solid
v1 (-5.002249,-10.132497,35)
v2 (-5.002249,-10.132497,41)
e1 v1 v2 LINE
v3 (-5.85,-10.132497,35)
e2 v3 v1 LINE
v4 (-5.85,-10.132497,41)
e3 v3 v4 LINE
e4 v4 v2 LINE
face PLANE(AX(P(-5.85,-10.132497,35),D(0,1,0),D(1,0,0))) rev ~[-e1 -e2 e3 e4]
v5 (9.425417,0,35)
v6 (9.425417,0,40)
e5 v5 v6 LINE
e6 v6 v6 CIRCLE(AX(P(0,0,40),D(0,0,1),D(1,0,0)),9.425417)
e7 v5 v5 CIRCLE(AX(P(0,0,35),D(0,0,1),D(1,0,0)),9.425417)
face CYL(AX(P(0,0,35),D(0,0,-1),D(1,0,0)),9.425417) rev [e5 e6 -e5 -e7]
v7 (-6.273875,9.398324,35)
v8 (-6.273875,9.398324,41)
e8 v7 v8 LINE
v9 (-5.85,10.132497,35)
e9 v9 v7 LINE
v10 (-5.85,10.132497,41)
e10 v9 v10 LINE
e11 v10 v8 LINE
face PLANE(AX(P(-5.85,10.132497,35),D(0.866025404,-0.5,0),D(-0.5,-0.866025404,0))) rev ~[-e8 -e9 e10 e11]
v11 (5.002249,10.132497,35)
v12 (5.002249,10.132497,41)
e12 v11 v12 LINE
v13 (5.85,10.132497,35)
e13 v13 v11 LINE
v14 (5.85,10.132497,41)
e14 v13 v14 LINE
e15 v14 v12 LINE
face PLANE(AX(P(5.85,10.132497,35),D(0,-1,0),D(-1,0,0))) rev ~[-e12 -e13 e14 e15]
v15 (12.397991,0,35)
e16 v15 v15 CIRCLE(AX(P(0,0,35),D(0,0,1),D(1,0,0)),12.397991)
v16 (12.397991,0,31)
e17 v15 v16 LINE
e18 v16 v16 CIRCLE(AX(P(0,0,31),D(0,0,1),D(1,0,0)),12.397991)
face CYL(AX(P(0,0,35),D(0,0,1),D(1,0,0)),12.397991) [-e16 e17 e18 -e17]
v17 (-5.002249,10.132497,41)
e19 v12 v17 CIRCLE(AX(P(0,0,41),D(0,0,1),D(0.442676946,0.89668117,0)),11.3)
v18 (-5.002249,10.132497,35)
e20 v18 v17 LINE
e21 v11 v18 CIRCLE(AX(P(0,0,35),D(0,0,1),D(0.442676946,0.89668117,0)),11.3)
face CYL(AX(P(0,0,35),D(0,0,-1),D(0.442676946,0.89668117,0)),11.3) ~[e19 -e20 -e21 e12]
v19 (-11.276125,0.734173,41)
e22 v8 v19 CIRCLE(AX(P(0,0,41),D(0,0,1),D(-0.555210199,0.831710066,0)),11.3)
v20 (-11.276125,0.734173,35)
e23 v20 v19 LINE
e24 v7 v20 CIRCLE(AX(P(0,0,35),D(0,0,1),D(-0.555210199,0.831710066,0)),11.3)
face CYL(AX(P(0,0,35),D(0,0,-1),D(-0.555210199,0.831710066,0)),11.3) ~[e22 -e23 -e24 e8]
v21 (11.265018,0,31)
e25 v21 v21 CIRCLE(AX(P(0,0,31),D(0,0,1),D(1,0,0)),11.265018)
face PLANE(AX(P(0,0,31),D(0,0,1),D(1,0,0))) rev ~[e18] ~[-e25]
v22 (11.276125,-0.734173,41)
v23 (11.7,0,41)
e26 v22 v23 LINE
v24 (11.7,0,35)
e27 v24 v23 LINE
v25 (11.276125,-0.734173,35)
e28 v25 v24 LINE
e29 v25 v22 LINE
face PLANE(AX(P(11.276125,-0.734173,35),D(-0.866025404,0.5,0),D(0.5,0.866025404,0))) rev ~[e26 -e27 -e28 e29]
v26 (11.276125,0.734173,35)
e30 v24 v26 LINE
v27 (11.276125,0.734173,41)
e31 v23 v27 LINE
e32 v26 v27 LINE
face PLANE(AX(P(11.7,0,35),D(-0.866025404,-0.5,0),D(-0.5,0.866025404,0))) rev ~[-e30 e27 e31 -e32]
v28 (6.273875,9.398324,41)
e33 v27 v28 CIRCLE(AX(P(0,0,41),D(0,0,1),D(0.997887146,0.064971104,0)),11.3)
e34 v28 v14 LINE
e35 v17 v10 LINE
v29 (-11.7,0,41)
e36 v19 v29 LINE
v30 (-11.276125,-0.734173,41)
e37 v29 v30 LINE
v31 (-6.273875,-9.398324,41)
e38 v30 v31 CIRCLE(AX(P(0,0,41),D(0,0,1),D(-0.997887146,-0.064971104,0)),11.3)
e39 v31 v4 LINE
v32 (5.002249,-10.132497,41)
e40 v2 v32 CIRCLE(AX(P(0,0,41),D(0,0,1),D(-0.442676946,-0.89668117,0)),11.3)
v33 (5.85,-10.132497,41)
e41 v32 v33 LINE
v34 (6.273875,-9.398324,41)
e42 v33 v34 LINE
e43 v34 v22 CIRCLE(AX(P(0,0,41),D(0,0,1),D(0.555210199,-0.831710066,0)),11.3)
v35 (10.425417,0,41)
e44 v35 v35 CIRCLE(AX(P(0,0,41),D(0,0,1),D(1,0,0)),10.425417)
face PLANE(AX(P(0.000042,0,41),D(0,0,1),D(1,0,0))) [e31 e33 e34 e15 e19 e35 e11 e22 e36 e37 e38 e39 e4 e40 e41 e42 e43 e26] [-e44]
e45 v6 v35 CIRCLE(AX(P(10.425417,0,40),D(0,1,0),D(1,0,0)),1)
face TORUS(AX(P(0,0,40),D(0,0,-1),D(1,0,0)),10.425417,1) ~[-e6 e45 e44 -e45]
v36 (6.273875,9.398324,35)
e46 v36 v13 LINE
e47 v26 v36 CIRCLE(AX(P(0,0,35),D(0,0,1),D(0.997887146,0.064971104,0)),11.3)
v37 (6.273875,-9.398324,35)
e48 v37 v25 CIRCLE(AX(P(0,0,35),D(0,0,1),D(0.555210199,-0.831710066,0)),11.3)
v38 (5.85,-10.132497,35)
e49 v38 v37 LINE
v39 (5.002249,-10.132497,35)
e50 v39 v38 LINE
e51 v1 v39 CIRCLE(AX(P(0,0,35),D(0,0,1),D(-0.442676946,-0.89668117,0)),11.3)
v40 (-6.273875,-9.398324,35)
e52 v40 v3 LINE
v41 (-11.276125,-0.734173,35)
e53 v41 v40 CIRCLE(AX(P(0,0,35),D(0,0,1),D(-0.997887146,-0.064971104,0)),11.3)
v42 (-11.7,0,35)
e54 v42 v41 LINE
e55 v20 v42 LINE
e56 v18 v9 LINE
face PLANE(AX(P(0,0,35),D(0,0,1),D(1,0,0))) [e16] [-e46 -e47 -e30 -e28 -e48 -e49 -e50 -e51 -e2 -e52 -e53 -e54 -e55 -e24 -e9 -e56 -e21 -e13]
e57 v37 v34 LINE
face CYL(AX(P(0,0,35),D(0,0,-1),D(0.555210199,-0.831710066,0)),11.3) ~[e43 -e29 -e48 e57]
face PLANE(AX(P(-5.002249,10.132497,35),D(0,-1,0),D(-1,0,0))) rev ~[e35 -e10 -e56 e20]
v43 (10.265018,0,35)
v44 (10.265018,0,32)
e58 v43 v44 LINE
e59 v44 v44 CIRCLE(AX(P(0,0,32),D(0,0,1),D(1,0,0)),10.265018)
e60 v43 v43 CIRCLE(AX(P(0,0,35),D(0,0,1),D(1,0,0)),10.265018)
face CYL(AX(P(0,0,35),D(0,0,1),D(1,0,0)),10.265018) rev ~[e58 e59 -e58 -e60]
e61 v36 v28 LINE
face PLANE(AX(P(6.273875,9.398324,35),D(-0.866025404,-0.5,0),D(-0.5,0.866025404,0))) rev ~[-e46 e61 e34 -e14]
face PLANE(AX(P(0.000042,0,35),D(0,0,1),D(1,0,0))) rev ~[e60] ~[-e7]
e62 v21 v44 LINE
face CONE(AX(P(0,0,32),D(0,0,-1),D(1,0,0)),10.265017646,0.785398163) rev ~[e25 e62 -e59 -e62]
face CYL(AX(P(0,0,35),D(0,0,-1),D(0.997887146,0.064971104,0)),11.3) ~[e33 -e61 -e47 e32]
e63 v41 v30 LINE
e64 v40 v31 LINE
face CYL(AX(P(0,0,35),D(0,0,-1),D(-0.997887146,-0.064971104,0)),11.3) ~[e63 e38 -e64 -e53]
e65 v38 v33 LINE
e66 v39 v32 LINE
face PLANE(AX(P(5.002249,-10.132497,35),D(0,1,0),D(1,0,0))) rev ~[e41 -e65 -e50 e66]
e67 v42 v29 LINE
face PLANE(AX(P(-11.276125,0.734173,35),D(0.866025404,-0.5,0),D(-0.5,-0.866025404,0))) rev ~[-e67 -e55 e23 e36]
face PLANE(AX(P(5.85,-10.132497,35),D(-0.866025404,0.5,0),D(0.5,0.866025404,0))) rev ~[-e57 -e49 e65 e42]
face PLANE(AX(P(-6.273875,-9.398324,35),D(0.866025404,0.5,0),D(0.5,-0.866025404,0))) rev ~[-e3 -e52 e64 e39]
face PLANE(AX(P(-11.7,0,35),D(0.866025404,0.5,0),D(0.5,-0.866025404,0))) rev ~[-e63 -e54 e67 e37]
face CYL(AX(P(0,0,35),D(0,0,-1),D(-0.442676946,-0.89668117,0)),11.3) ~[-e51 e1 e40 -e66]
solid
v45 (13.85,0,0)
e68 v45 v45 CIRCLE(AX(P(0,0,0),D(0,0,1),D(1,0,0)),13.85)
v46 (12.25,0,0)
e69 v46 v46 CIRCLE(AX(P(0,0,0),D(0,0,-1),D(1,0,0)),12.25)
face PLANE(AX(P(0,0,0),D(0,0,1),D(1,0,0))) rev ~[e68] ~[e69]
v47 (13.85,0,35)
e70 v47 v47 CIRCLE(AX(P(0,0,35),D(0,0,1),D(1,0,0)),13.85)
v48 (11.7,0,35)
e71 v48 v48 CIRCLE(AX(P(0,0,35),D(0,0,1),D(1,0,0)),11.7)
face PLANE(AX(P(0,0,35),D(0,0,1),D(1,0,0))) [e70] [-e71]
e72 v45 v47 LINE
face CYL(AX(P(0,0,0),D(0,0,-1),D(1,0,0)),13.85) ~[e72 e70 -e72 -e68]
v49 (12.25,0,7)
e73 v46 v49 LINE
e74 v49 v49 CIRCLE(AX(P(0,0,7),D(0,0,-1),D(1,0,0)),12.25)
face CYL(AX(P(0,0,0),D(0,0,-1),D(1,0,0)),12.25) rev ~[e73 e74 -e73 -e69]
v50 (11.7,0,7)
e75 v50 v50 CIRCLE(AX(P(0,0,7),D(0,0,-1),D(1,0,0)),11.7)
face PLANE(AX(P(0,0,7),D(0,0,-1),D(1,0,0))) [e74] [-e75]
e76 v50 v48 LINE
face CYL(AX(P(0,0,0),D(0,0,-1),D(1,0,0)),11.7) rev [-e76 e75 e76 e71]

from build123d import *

# Parameters (mm, degrees)
F0_R     = 13.85
F0_R_2   = 11.7
F1_DEPTH = 35
F2_R     = 9.4254173389
F3_DEPTH = 6
F4_R     = 12.3979909048
F4_R_2   = 10.2650176462
F5_DEPTH = 4
F6_SIZE  = 1
F7_R     = 1
F8_R     = 12.25
F9_DEPTH = 7


with BuildPart() as f1:
    # F0 (on Top) → F1 (new body)
    with BuildSketch(Plane.XY):
        Circle(F0_R)
        Circle(F0_R_2, mode=Mode.SUBTRACT)
    extrude(amount=F1_DEPTH)

    # F8 (on face) → F9 (cut)
    with BuildSketch(Plane(origin=(0, 0, 0), x_dir=(1, 0, 0), z_dir=(0, 0, -1))):
        Circle(F8_R)
    extrude(amount=-F9_DEPTH, mode=Mode.SUBTRACT)


with BuildPart() as f3:
    # F2 (on face) → F3 (new body)
    with BuildSketch(Plane.XY.offset(35)):
        with BuildLine():
            ThreePointArc((11.276124747, -0.7341734743), (11.2940296095, -0.3672807911), (11.3, 0))
            ThreePointArc((11.3, 0), (11.2940296095, 0.3672807911), (11.276124747, 0.7341734743))
            Line((11.276124747, 0.7341734743), (6.273875253, 9.39832375))
            ThreePointArc((6.273875253, 9.39832375), (5.65, 9.7860870628), (5.002249494, 10.1324972243))
            Line((5.002249494, 10.1324972243), (-5.002249494, 10.1324972243))
            ThreePointArc((-5.002249494, 10.1324972243), (-5.65, 9.7860870628), (-6.273875253, 9.39832375))
            Line((-6.273875253, 9.39832375), (-11.276124747, 0.7341734743))
            ThreePointArc((-11.276124747, 0.7341734743), (-11.3, 0), (-11.276124747, -0.7341734743))
            Line((-11.276124747, -0.7341734743), (-6.273875253, -9.39832375))
            ThreePointArc((-6.273875253, -9.39832375), (-5.65, -9.7860870628), (-5.002249494, -10.1324972243))
            Line((-5.002249494, -10.1324972243), (5.002249494, -10.1324972243))
            ThreePointArc((5.002249494, -10.1324972243), (5.65, -9.7860870628), (6.273875253, -9.39832375))
            Line((6.273875253, -9.39832375), (11.276124747, -0.7341734743))
        make_face()
        Circle(F2_R, mode=Mode.SUBTRACT)
        with BuildLine():
            ThreePointArc((11.276124747, 0.7341734743), (11.2940296095, 0.3672807911), (11.3, 0))
            ThreePointArc((11.3, 0), (11.2940296095, -0.3672807911), (11.276124747, -0.7341734743))
            Line((11.276124747, -0.7341734743), (11.7, 0))
            Line((11.7, 0), (11.276124747, 0.7341734743))
        make_face()
        with BuildLine():
            Line((6.273875253, 9.39832375), (11.276124747, 0.7341734743))
            ThreePointArc((11.276124747, 0.7341734743), (9.7860870628, 5.65), (6.273875253, 9.39832375))
        make_face()
        with BuildLine():
            ThreePointArc((6.273875253, -9.39832375), (9.7860870628, -5.65), (11.276124747, -0.7341734743))
            Line((11.276124747, -0.7341734743), (6.273875253, -9.39832375))
        make_face()
        with BuildLine():
            ThreePointArc((5.002249494, 10.1324972243), (5.65, 9.7860870628), (6.273875253, 9.39832375))
            Line((6.273875253, 9.39832375), (5.85, 10.1324972243))
            Line((5.85, 10.1324972243), (5.002249494, 10.1324972243))
        make_face()
        with BuildLine():
            Line((5.85, -10.1324972243), (6.273875253, -9.39832375))
            ThreePointArc((6.273875253, -9.39832375), (5.65, -9.7860870628), (5.002249494, -10.1324972243))
            Line((5.002249494, -10.1324972243), (5.85, -10.1324972243))
        make_face()
        with BuildLine():
            Line((-5.002249494, 10.1324972243), (5.002249494, 10.1324972243))
            ThreePointArc((5.002249494, 10.1324972243), (0, 11.3), (-5.002249494, 10.1324972243))
        make_face()
        with BuildLine():
            ThreePointArc((-5.002249494, -10.1324972243), (0, -11.3), (5.002249494, -10.1324972243))
            Line((5.002249494, -10.1324972243), (-5.002249494, -10.1324972243))
        make_face()
        with BuildLine():
            ThreePointArc((-6.273875253, 9.39832375), (-5.65, 9.7860870628), (-5.002249494, 10.1324972243))
            Line((-5.002249494, 10.1324972243), (-5.85, 10.1324972243))
            Line((-5.85, 10.1324972243), (-6.273875253, 9.39832375))
        make_face()
        with BuildLine():
            Line((-5.85, -10.1324972243), (-5.002249494, -10.1324972243))
            ThreePointArc((-5.002249494, -10.1324972243), (-5.65, -9.7860870628), (-6.273875253, -9.39832375))
            Line((-6.273875253, -9.39832375), (-5.85, -10.1324972243))
        make_face()
        with BuildLine():
            Line((-11.276124747, 0.7341734743), (-6.273875253, 9.39832375))
            ThreePointArc((-6.273875253, 9.39832375), (-9.7860870628, 5.65), (-11.276124747, 0.7341734743))
        make_face()
        with BuildLine():
            ThreePointArc((-11.276124747, -0.7341734743), (-9.7860870628, -5.65), (-6.273875253, -9.39832375))
            Line((-6.273875253, -9.39832375), (-11.276124747, -0.7341734743))
        make_face()
        with BuildLine():
            ThreePointArc((-11.276124747, -0.7341734743), (-11.3, 0), (-11.276124747, 0.7341734743))
            Line((-11.276124747, 0.7341734743), (-11.7, 0))
            Line((-11.7, 0), (-11.276124747, -0.7341734743))
        make_face()
    extrude(amount=F3_DEPTH)

    # F4 (on face) → F5 (join)
    with BuildSketch(Plane.XY.offset(35)):
        Circle(F4_R)
        Circle(F4_R_2, mode=Mode.SUBTRACT)
    extrude(amount=-F5_DEPTH)

    # F6
    f6_edges = [f3.edges().sort_by_distance(p)[0] for p in [
        (-10.265018, 0, 31),
    ]]
    chamfer(f6_edges, length=F6_SIZE)

    # F7
    f7_edges = [f3.edges().sort_by_distance(p)[0] for p in [
        (-9.425417, 0, 41),
    ]]
    fillet(f7_edges, radius=F7_R)


solid = Compound([f1.part, f3.part])
